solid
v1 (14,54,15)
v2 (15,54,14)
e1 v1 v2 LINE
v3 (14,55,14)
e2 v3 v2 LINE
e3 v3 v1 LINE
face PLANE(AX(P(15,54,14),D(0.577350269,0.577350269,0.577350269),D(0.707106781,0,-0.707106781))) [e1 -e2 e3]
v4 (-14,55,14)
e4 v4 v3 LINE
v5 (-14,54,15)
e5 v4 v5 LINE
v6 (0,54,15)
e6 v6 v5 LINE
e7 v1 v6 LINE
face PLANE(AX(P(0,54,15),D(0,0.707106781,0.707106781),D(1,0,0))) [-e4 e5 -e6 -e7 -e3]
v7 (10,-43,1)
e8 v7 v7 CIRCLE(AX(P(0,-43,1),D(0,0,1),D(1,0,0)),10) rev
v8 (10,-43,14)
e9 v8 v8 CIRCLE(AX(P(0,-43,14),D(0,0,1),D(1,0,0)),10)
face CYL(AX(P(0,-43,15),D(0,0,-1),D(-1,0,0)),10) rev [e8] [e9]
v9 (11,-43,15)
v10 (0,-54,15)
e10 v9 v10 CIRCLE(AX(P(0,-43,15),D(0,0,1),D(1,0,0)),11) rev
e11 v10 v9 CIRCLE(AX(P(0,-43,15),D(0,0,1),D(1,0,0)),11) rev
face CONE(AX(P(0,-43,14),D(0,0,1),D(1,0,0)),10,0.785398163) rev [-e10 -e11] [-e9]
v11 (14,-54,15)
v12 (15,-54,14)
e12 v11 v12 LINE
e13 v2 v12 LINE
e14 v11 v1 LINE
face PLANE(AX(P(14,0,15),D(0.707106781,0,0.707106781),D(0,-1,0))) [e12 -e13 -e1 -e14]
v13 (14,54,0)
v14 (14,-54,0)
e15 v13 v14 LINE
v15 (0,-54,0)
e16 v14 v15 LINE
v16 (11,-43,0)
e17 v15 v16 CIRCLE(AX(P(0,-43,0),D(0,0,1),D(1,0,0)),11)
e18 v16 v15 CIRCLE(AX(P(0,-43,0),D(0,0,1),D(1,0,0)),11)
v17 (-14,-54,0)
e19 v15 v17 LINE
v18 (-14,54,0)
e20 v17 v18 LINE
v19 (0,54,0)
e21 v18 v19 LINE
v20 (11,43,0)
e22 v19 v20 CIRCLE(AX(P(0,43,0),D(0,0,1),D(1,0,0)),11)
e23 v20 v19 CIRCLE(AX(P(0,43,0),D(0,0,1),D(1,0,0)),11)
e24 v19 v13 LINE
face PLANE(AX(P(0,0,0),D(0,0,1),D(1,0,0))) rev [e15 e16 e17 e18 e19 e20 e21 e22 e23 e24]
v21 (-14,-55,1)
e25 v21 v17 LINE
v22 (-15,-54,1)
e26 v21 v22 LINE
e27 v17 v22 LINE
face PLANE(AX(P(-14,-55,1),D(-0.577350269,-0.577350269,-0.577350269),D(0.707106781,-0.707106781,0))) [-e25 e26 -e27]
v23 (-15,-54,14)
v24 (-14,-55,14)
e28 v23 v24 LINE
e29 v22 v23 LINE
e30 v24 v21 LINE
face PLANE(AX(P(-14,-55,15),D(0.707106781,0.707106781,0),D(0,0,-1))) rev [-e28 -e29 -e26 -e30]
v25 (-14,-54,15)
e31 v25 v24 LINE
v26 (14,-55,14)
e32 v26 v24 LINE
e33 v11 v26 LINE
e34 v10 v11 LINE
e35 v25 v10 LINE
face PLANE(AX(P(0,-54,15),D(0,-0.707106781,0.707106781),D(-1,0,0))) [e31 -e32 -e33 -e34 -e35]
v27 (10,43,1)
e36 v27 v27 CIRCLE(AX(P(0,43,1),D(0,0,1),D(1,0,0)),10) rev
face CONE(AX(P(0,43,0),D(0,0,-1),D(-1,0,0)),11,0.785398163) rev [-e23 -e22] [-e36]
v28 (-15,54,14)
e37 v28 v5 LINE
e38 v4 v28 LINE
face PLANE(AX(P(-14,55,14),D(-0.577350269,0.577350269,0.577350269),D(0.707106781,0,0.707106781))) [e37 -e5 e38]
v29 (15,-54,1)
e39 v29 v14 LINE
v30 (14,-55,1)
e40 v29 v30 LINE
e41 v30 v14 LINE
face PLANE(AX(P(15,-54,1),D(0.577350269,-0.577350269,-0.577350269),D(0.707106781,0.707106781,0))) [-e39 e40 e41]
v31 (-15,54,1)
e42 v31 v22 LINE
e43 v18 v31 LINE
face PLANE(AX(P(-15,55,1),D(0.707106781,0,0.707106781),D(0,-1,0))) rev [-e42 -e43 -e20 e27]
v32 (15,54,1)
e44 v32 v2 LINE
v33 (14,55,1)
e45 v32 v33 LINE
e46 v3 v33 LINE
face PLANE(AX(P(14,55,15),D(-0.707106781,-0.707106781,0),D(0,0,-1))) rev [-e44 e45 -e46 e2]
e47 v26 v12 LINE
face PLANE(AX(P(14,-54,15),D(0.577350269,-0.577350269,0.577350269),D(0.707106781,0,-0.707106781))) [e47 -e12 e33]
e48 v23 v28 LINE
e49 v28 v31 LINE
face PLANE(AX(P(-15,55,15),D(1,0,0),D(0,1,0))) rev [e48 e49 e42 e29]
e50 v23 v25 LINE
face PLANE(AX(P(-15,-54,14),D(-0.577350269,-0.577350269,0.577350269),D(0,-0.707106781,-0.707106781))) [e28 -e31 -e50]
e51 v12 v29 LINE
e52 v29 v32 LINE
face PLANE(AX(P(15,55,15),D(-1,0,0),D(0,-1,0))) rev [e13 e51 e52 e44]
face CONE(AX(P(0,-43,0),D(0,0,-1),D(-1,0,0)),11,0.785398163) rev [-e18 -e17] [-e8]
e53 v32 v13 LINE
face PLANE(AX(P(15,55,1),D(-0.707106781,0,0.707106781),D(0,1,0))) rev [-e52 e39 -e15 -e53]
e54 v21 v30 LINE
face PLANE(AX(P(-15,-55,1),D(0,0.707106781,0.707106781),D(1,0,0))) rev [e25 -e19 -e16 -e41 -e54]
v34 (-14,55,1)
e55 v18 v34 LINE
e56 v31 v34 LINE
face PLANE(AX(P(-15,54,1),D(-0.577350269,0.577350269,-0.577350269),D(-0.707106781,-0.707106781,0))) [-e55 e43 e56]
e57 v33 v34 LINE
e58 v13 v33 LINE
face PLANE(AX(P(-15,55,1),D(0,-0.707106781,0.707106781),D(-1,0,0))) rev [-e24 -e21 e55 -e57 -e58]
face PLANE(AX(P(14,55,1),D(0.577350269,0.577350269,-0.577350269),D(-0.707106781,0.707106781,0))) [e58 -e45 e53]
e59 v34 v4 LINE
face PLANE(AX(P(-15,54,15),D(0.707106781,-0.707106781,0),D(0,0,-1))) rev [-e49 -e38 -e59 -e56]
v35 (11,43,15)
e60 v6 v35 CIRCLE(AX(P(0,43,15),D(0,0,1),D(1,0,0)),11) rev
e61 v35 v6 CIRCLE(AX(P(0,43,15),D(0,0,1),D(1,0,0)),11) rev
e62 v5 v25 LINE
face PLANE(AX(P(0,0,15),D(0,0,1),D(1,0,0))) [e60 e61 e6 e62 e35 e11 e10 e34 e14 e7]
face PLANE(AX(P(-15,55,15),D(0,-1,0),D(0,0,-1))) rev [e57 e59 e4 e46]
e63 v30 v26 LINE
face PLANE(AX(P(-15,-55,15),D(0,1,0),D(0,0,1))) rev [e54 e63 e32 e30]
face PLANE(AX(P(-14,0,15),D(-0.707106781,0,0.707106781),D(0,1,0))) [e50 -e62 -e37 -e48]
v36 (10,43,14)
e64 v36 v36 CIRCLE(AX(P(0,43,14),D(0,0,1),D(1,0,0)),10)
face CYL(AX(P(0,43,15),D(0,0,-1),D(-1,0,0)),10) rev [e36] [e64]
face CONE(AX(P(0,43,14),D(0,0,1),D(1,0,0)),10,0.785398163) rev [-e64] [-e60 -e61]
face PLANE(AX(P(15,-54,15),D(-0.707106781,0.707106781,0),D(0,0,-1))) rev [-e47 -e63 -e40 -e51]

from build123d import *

# Parameters (mm, degrees)
SKETCH1_W           = 30
SKETCH1_H           = 110
SKETCH1_R           = 10
BOSS_EXTRUDE1_DEPTH = 15
CHAMFER1_SIZE       = 1


with BuildPart() as part:
    # Sketch1 → Boss-Extrude1 (new body)
    with BuildSketch(Plane.XY):
        Rectangle(SKETCH1_W, SKETCH1_H)
        with Locations((0, 43)):
            Circle(SKETCH1_R, mode=Mode.SUBTRACT)
        with Locations((0, -43)):
            Circle(SKETCH1_R, mode=Mode.SUBTRACT)
    extrude(amount=BOSS_EXTRUDE1_DEPTH)

    # Chamfer1
    chamfer1_edges = [part.edges().sort_by_distance(p)[0] for p in [
        (-15, 0, 15),
        (-10, 43, 0),
        (-10, 43, 15),
        (0, -55, 15),
        (-10, -43, 0),
        (-10, -43, 15),
        (15, 0, 15),
        (0, -55, 0),
        (-15, 0, 0),
        (0, 55, 0),
        (15, 0, 0),
        (0, 55, 15),
        (15, -55, 7.5),
        (-15, -55, 7.5),
        (-15, 55, 7.5),
        (15, 55, 7.5),
    ]]
    chamfer(chamfer1_edges, length=CHAMFER1_SIZE - 0.0001)  # a hair under: the kernel refuses the full size


solid = part.part
